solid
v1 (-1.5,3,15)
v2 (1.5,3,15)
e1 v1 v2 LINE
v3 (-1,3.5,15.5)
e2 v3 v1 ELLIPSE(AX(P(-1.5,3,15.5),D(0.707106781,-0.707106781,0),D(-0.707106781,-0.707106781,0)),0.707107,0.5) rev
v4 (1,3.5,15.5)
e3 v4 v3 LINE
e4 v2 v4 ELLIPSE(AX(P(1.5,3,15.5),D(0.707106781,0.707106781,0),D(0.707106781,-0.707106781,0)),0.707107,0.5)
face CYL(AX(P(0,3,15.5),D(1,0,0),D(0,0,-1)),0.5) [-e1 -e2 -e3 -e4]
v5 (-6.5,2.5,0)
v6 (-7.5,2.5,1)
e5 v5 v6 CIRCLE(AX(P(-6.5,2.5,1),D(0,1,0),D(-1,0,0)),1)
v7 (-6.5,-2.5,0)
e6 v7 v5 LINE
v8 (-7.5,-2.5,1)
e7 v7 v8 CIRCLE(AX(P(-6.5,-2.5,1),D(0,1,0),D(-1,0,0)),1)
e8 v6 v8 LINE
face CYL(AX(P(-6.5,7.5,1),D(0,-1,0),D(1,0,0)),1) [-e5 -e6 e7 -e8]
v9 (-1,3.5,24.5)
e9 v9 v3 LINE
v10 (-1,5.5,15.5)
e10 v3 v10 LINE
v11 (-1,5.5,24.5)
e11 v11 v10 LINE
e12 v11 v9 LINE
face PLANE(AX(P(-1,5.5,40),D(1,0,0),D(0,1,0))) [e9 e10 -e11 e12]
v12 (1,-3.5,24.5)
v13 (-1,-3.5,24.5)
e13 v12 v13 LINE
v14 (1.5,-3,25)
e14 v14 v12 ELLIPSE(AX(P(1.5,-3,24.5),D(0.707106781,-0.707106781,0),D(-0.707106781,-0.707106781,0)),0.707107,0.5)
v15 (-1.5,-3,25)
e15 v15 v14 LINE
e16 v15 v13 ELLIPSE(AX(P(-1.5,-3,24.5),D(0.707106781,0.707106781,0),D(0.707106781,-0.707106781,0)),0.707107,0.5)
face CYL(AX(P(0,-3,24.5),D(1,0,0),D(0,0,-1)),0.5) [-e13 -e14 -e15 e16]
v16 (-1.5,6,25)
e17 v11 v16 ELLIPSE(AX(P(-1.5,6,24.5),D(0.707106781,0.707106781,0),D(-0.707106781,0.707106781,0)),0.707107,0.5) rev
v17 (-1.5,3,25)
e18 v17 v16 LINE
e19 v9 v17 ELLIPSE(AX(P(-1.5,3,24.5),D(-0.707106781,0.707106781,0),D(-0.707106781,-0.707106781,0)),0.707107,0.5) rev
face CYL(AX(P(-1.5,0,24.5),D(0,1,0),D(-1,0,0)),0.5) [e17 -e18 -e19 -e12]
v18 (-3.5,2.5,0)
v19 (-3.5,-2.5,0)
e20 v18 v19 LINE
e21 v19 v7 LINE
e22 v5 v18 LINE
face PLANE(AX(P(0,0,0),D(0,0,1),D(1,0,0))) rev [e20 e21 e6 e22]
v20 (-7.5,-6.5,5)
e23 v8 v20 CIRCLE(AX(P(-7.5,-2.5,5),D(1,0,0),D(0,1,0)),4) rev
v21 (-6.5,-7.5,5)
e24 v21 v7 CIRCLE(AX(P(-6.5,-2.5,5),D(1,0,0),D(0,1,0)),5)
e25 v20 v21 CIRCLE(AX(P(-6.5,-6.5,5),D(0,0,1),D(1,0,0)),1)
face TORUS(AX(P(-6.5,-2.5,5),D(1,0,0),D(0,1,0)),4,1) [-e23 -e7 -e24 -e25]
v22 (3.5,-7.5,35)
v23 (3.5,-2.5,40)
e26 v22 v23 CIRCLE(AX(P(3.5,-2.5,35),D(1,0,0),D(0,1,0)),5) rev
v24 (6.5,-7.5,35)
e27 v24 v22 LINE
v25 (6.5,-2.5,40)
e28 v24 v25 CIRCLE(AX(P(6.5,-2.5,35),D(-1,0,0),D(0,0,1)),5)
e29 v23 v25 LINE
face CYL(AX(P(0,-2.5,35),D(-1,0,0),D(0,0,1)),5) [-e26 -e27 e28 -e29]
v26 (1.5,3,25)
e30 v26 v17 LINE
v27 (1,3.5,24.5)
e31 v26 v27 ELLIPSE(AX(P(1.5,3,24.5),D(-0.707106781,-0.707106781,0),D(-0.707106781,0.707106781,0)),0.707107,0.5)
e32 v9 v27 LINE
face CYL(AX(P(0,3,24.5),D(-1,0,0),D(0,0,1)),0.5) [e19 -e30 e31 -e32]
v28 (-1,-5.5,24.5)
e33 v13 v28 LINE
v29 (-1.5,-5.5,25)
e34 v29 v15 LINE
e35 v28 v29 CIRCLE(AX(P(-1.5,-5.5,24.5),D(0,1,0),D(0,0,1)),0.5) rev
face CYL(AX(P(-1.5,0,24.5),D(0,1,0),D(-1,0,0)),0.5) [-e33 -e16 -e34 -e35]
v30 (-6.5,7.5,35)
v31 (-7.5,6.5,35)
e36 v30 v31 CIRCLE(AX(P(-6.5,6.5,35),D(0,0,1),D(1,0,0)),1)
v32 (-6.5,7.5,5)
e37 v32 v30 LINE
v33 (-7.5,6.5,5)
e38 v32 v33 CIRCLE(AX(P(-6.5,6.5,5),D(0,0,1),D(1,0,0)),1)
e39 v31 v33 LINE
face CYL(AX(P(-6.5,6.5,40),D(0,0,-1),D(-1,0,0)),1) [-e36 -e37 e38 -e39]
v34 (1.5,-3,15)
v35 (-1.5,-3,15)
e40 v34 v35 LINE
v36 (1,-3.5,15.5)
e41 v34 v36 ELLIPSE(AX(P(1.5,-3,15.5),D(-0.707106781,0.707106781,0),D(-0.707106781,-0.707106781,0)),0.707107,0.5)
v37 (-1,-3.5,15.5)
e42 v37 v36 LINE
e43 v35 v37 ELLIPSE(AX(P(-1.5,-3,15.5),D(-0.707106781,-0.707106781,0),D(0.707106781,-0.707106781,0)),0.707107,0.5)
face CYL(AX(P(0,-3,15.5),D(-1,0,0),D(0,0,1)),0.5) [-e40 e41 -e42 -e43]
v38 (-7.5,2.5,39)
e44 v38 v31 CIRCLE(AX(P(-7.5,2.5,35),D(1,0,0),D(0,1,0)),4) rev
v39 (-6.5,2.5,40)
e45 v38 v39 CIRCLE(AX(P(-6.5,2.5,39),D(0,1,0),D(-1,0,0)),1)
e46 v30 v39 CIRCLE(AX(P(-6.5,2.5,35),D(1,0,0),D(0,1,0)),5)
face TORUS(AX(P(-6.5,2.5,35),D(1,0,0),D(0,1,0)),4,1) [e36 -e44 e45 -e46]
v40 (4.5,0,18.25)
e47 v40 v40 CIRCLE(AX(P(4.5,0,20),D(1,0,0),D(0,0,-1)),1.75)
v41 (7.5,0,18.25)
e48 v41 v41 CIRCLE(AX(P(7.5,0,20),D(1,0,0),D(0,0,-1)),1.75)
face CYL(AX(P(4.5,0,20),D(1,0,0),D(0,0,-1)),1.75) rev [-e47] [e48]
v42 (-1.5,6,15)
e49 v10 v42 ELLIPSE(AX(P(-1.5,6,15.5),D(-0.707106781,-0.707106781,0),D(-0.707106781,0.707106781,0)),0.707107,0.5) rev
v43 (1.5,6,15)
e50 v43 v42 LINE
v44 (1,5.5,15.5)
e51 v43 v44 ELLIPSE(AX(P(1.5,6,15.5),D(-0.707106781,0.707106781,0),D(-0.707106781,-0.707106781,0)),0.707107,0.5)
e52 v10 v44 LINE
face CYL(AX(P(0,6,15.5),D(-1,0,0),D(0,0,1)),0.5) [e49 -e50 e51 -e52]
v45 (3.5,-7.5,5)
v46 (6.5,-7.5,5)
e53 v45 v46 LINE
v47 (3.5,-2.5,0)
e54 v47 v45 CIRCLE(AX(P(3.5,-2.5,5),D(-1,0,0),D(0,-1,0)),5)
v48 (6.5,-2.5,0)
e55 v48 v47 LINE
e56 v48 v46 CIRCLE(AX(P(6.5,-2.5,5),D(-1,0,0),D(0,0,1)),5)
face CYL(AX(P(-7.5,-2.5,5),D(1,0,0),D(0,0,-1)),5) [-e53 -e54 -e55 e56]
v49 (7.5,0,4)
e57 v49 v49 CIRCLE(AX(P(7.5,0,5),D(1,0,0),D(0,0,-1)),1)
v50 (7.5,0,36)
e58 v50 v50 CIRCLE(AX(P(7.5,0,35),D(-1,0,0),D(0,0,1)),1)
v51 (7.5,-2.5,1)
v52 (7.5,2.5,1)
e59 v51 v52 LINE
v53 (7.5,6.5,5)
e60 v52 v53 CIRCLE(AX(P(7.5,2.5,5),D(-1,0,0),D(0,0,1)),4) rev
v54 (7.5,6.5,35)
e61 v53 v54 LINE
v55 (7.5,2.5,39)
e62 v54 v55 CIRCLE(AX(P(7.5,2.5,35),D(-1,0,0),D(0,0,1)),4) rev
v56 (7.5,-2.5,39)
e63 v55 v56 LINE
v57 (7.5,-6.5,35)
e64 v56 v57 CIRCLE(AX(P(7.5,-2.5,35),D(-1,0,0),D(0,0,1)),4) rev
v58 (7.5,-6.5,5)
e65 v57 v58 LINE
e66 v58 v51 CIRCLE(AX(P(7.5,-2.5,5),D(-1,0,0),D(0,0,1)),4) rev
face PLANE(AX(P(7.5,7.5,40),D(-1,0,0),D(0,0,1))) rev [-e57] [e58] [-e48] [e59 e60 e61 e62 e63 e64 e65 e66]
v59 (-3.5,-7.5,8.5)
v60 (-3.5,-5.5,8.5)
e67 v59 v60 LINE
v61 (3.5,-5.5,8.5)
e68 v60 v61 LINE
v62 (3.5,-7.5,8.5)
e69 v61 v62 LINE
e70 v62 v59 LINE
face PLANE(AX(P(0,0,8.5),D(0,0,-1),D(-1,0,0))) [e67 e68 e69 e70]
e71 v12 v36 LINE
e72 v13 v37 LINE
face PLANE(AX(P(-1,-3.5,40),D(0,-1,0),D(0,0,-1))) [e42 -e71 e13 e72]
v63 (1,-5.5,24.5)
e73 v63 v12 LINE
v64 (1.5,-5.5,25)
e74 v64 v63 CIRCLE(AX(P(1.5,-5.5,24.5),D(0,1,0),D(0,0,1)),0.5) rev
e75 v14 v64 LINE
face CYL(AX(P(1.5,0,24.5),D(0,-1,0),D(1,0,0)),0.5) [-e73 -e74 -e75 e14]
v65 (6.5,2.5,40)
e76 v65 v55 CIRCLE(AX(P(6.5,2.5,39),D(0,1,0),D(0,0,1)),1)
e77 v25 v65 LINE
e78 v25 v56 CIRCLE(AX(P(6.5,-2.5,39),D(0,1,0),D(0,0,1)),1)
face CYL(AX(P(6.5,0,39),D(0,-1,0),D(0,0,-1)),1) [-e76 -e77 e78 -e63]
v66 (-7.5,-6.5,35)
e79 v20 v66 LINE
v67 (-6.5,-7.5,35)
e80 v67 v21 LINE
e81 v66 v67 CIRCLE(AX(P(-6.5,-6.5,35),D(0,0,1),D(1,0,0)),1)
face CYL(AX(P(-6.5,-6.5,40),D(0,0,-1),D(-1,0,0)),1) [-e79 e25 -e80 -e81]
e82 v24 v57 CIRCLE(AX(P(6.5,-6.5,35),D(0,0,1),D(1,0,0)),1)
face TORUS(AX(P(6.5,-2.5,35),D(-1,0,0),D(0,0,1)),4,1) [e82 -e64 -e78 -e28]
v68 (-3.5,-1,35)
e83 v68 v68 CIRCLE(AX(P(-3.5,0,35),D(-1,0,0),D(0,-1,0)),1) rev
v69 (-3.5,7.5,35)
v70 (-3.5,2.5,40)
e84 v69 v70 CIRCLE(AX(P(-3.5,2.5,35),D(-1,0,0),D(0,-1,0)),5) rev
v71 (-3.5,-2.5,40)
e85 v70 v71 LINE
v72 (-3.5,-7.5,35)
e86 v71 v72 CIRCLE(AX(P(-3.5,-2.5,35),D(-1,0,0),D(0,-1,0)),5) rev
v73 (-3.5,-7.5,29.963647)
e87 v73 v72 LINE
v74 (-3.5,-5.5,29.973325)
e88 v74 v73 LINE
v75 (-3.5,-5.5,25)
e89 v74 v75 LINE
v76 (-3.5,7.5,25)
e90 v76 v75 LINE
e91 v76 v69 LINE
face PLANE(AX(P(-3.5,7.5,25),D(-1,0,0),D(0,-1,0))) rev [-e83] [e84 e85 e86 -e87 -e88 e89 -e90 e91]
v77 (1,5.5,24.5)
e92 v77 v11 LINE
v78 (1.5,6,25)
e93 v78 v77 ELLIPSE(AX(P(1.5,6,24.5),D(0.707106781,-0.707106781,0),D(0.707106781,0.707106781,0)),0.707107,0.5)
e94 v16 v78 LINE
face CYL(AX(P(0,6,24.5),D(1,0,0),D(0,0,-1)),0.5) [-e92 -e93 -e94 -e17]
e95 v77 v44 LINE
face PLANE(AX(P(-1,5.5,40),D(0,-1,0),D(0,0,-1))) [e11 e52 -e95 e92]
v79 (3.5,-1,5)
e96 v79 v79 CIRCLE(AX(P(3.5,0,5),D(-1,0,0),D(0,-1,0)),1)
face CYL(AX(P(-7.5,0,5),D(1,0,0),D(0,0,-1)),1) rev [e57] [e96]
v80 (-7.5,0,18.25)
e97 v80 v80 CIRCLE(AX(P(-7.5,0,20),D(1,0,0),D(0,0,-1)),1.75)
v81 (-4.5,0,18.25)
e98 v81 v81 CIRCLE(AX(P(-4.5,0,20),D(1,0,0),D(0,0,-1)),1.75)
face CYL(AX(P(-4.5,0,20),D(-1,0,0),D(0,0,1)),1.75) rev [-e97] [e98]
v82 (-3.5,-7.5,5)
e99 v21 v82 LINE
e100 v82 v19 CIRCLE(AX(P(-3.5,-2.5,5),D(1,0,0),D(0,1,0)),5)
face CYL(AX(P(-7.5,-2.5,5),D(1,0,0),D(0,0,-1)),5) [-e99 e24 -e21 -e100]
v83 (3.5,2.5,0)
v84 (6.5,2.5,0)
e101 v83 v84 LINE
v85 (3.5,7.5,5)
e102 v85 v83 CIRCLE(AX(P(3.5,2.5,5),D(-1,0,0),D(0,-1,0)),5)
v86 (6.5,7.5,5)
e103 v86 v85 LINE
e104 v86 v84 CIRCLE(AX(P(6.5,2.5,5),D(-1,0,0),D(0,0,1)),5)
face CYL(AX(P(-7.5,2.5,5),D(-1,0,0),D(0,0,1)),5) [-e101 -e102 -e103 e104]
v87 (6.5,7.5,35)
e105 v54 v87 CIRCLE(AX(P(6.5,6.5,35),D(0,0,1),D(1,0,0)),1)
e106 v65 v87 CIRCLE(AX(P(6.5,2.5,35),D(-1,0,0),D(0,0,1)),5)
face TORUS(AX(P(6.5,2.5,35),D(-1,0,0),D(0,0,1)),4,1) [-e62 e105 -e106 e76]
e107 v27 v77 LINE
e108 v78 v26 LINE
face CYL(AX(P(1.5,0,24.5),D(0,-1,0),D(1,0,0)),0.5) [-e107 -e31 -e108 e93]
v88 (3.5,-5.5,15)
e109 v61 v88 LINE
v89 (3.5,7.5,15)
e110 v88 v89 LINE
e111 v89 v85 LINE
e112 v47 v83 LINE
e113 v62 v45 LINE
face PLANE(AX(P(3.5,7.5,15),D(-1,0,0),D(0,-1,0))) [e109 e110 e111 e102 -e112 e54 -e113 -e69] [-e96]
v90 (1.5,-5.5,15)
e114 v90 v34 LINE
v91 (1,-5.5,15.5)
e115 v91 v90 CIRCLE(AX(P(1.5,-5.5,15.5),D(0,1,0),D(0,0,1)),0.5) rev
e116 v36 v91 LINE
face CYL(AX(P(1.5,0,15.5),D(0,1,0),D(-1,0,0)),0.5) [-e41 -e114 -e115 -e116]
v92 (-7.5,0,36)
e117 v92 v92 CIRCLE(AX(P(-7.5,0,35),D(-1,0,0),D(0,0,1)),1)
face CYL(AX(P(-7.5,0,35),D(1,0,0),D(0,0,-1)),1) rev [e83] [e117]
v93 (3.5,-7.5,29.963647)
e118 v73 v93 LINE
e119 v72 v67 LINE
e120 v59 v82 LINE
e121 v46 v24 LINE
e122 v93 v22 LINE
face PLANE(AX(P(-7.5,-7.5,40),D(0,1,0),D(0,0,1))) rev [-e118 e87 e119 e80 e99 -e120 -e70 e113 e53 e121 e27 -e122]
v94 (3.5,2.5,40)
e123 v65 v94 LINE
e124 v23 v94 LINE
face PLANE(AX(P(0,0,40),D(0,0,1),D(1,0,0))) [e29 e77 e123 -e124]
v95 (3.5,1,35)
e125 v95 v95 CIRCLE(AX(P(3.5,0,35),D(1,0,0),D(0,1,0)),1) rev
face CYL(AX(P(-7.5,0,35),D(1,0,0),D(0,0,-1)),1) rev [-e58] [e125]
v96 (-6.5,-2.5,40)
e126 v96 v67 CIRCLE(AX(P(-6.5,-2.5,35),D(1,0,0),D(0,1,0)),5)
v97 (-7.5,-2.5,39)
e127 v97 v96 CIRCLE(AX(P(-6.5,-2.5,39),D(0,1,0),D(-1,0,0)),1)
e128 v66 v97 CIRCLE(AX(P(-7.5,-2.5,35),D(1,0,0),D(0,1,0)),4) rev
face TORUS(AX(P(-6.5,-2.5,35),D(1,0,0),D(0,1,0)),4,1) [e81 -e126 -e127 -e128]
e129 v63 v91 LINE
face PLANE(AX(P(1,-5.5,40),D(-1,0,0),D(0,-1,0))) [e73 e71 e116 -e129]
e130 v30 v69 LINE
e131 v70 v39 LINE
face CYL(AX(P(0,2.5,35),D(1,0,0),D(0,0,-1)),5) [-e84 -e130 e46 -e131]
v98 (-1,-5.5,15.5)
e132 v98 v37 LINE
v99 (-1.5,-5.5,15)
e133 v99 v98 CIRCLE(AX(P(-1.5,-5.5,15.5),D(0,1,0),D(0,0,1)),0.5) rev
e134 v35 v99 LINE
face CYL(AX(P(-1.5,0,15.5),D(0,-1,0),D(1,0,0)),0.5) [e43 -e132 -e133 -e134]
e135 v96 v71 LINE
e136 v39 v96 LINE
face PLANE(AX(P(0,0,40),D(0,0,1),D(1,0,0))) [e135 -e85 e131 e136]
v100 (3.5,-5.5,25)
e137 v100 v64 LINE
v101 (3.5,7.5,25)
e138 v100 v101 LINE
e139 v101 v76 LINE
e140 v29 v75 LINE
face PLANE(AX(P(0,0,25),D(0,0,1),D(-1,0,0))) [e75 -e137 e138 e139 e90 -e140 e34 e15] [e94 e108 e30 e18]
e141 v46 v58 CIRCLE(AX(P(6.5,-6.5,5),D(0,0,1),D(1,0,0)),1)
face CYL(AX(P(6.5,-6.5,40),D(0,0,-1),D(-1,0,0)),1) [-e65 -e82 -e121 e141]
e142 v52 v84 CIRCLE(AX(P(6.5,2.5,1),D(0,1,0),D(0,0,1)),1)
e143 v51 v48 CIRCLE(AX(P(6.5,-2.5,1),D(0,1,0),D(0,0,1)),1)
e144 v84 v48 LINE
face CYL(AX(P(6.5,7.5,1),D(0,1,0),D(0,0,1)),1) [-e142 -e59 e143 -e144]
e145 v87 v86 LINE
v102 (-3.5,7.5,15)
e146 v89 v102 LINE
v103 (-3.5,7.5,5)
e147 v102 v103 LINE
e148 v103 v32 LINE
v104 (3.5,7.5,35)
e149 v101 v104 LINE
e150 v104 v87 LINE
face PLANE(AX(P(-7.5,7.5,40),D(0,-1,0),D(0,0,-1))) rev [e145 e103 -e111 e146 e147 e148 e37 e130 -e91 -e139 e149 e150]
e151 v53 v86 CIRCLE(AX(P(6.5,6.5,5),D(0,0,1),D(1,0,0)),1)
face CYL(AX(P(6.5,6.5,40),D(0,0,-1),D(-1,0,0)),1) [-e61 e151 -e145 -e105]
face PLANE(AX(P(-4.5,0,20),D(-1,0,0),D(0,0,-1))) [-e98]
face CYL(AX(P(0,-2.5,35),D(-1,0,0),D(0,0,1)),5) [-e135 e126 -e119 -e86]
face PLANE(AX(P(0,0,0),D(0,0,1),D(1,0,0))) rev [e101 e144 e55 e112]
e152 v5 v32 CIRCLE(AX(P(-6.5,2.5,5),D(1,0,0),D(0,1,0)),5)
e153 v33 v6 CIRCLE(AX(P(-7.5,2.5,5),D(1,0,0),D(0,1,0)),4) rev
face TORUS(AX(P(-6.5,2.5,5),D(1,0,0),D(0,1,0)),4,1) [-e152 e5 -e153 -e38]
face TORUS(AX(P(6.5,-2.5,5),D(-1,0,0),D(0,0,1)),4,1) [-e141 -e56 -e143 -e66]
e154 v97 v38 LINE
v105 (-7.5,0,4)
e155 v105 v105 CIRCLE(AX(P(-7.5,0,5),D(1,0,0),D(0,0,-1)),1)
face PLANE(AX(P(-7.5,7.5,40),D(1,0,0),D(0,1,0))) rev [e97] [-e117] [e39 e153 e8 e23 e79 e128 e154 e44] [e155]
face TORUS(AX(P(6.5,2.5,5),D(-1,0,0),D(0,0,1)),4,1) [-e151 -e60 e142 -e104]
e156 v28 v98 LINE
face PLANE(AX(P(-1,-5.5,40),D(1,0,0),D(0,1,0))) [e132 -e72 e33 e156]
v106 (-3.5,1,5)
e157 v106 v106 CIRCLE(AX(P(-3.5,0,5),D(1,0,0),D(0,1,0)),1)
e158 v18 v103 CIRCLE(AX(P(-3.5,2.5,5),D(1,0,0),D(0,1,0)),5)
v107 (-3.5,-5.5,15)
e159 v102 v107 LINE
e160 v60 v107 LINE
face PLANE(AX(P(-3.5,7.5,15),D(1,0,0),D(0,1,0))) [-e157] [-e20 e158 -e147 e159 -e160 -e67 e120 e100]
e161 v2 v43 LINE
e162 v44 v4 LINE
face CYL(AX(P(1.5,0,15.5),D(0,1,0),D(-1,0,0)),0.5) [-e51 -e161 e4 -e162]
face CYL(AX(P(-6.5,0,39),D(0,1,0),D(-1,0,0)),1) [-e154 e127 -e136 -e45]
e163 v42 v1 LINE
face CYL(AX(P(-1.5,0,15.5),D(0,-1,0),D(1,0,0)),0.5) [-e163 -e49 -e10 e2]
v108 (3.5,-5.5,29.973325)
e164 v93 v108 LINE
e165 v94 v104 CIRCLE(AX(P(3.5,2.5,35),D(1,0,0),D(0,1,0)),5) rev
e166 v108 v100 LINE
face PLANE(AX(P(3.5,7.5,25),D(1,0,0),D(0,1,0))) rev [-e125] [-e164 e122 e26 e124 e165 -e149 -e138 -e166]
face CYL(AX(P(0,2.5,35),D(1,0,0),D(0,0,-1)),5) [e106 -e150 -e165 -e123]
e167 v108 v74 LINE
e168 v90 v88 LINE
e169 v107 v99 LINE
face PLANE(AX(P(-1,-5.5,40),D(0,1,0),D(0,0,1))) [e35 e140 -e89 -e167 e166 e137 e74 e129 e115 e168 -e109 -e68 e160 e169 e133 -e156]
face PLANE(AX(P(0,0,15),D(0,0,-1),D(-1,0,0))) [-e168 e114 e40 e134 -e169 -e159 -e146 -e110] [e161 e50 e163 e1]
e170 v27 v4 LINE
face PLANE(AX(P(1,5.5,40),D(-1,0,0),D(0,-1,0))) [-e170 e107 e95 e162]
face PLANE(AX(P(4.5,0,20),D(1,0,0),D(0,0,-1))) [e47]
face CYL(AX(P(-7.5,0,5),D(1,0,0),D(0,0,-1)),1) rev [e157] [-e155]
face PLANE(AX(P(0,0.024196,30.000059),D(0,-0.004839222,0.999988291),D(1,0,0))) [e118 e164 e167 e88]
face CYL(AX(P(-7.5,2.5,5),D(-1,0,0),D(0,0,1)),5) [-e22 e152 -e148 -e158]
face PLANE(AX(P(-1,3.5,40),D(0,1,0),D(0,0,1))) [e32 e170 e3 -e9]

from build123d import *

# Parameters (mm, degrees)
BOTTOM_SECTION_BASE_SKETCH_W             = 15
BOTTOM_SECTION_BASE_SKETCH_H             = 15
BOTTOM_SECTION_EXTRUDE_DEPTH             = 40
HINGE_CUTOUT_SKETCH_W                    = 7
HINGE_CUTOUT_SKETCH_H                    = 15
HINGE_CUTOUT_EXTRUDED_CUT_DEPTH          = 15
HINGE_HOLE_SKETCH_R                      = 1
HINGE_HOLE_EXTRUDED_CUT_DEPTH            = 44.373378932
HINGER_CORNER_FILLETS_R                  = 5
STYLE_FILLETS_R                          = 1
ROUTING_HOLES_SKETCH_W                   = 2
ROUTING_HOLES_SKETCH_H                   = 2
ROUTING_HOLES_EXTRUDED_CUT_DEPTH         = 42.382363393
BACKING_START                            = -3.5
BACKING_EXTRUDE_DEPTH                    = 7
BOTTOM_SECTION_CONNECTION_HOLE_R         = 1.75
BOTTOM_SECTION_CONNECTION_HOLE_CUT_DEPTH = 3
SKETCH2_W                                = 7
SKETCH2_H                                = 2
BOTTOM_EXTENSION_EXTRUDE_DEPTH           = 6.5
FILLET1_R                                = 0.5


# Read off the part's stored shape, not the designer's step: Backing Extrude
with BuildPart() as part:
    # Bottom Section Base Sketch → Bottom Section Extrude (new body)
    with BuildSketch(Plane.XY):
        Rectangle(BOTTOM_SECTION_BASE_SKETCH_W, BOTTOM_SECTION_BASE_SKETCH_H)
    extrude(amount=BOTTOM_SECTION_EXTRUDE_DEPTH)

    # Hinge Cutout Sketch → Hinge Cutout Extruded Cut (cut)
    with BuildSketch(Plane.XY):
        Rectangle(HINGE_CUTOUT_SKETCH_W, HINGE_CUTOUT_SKETCH_H)
    hinge_cutout_extruded_cut = extrude(amount=HINGE_CUTOUT_EXTRUDED_CUT_DEPTH, mode=Mode.SUBTRACT)

    # Hinge Hole Sketch → Hinge Hole Extruded Cut (cut, through all)
    with BuildSketch(Plane(origin=(7.5, 0, 0), x_dir=(0, 0, -1), z_dir=(1, 0, 0))):
        with Locations((-5, 0)):
            Circle(HINGE_HOLE_SKETCH_R)
    hinge_hole_extruded_cut = extrude(amount=-HINGE_HOLE_EXTRUDED_CUT_DEPTH, mode=Mode.SUBTRACT)

    # Hinge and Hole Cutout Mirror: Hinge Cutout Extruded Cut, Hinge Hole Extruded Cut across plane
    add(hinge_cutout_extruded_cut.mirror(Plane.XY.offset(20)), mode=Mode.SUBTRACT)
    add(hinge_hole_extruded_cut.mirror(Plane.XY.offset(20)), mode=Mode.SUBTRACT)

    # Hinger Corner Fillets
    hinger_corner_fillets_edges = [part.edges().sort_by_distance(p)[0] for p in [
        (5.5, -7.5, 0),
        (-5.5, 7.5, 0),
        (-5.5, -7.5, 40),
        (-5.5, 7.5, 40),
        (5.5, -7.5, 40),
        (-5.5, -7.5, 0),
        (5.5, 7.5, 0),
        (5.5, 7.5, 40),
    ]]
    fillet(hinger_corner_fillets_edges, radius=HINGER_CORNER_FILLETS_R)

    # Style Fillets
    style_fillets_edges = [part.edges().sort_by_distance(p)[0] for p in [
        (7.5, 0, 40),
        (7.5, 7.5, 20),
        (-7.5, 7.5, 20),
        (7.5, 0, 0),
        (7.5, -7.5, 20),
        (7.5, 6.035533906, 1.464466094),
        (7.5, -6.035533906, 1.464466094),
        (7.5, -6.035533906, 38.535533906),
        (7.5, 6.035533906, 38.535533906),
        (-7.5, -7.5, 20),
        (-7.5, 0, 40),
        (-7.5, 0, 0),
        (-7.5, -6.035533906, 1.464466094),
        (-7.5, 6.035533906, 1.464466094),
        (-7.5, 6.035533906, 38.535533906),
        (-7.5, -6.035533906, 38.535533906),
    ]]
    fillet(style_fillets_edges, radius=STYLE_FILLETS_R)

    # Routing Holes Sketch → Routing Holes Extruded Cut (cut, through all)
    with BuildSketch(Plane.XY):
        with Locations((0, 4.5)):
            Rectangle(ROUTING_HOLES_SKETCH_W, ROUTING_HOLES_SKETCH_H)
        with Locations((0, -4.5)):
            Rectangle(ROUTING_HOLES_SKETCH_W, ROUTING_HOLES_SKETCH_H)
    extrude(amount=ROUTING_HOLES_EXTRUDED_CUT_DEPTH, mode=Mode.SUBTRACT)

    # Backing Extrude outline → Backing Extrude (add)
    with BuildSketch(Plane.YZ.offset(BACKING_START)):
        Polygon((-7.5, 29.963646865), (-7.5, 25), (-5.5, 25), (-5.5, 29.973325422), align=None)
    extrude(amount=BACKING_EXTRUDE_DEPTH)

    # Bottom Section Connection Hole → Bottom Section Connection Hole Cut (cut)
    with BuildSketch(Plane(origin=(7.5, 0, 0), x_dir=(0, 0, -1), z_dir=(1, 0, 0))):
        with Locations((-20, 0)):
            Circle(BOTTOM_SECTION_CONNECTION_HOLE_R)
    bottom_section_connection_hole_cut = extrude(amount=-BOTTOM_SECTION_CONNECTION_HOLE_CUT_DEPTH, mode=Mode.SUBTRACT)

    # Sketch2 → Bottom extension Extrude (add)
    with BuildSketch(Plane(origin=(0, 0, 15), x_dir=(-1, 0, 0), z_dir=(0, 0, -1))):
        with Locations((0, -6.5)):
            Rectangle(SKETCH2_W, SKETCH2_H)
    extrude(amount=BOTTOM_EXTENSION_EXTRUDE_DEPTH)

    # Connection Hole Mirror: Bottom Section Connection Hole Cut across plane
    add(bottom_section_connection_hole_cut.mirror(Plane(origin=(0, 0, 0), x_dir=(0, 0, 1), z_dir=(1, 0, 0))), mode=Mode.SUBTRACT)

    # Fillet1
    fillet1_edges = [part.edges().sort_by_distance(p)[0] for p in [
        (-1, -4.5, 25),
        (0, -3.5, 25),
        (1, -4.5, 25),
        (0, 5.5, 25),
        (1, 4.5, 25),
        (0, 3.5, 25),
        (-1, 4.5, 25),
        (-1, 4.5, 15),
        (0, 3.5, 15),
        (1, 4.5, 15),
        (0, 5.5, 15),
        (1, -4.5, 15),
        (0, -3.5, 15),
        (-1, -4.5, 15),
    ]]
    fillet(fillet1_edges, radius=FILLET1_R)


solid = part.part
